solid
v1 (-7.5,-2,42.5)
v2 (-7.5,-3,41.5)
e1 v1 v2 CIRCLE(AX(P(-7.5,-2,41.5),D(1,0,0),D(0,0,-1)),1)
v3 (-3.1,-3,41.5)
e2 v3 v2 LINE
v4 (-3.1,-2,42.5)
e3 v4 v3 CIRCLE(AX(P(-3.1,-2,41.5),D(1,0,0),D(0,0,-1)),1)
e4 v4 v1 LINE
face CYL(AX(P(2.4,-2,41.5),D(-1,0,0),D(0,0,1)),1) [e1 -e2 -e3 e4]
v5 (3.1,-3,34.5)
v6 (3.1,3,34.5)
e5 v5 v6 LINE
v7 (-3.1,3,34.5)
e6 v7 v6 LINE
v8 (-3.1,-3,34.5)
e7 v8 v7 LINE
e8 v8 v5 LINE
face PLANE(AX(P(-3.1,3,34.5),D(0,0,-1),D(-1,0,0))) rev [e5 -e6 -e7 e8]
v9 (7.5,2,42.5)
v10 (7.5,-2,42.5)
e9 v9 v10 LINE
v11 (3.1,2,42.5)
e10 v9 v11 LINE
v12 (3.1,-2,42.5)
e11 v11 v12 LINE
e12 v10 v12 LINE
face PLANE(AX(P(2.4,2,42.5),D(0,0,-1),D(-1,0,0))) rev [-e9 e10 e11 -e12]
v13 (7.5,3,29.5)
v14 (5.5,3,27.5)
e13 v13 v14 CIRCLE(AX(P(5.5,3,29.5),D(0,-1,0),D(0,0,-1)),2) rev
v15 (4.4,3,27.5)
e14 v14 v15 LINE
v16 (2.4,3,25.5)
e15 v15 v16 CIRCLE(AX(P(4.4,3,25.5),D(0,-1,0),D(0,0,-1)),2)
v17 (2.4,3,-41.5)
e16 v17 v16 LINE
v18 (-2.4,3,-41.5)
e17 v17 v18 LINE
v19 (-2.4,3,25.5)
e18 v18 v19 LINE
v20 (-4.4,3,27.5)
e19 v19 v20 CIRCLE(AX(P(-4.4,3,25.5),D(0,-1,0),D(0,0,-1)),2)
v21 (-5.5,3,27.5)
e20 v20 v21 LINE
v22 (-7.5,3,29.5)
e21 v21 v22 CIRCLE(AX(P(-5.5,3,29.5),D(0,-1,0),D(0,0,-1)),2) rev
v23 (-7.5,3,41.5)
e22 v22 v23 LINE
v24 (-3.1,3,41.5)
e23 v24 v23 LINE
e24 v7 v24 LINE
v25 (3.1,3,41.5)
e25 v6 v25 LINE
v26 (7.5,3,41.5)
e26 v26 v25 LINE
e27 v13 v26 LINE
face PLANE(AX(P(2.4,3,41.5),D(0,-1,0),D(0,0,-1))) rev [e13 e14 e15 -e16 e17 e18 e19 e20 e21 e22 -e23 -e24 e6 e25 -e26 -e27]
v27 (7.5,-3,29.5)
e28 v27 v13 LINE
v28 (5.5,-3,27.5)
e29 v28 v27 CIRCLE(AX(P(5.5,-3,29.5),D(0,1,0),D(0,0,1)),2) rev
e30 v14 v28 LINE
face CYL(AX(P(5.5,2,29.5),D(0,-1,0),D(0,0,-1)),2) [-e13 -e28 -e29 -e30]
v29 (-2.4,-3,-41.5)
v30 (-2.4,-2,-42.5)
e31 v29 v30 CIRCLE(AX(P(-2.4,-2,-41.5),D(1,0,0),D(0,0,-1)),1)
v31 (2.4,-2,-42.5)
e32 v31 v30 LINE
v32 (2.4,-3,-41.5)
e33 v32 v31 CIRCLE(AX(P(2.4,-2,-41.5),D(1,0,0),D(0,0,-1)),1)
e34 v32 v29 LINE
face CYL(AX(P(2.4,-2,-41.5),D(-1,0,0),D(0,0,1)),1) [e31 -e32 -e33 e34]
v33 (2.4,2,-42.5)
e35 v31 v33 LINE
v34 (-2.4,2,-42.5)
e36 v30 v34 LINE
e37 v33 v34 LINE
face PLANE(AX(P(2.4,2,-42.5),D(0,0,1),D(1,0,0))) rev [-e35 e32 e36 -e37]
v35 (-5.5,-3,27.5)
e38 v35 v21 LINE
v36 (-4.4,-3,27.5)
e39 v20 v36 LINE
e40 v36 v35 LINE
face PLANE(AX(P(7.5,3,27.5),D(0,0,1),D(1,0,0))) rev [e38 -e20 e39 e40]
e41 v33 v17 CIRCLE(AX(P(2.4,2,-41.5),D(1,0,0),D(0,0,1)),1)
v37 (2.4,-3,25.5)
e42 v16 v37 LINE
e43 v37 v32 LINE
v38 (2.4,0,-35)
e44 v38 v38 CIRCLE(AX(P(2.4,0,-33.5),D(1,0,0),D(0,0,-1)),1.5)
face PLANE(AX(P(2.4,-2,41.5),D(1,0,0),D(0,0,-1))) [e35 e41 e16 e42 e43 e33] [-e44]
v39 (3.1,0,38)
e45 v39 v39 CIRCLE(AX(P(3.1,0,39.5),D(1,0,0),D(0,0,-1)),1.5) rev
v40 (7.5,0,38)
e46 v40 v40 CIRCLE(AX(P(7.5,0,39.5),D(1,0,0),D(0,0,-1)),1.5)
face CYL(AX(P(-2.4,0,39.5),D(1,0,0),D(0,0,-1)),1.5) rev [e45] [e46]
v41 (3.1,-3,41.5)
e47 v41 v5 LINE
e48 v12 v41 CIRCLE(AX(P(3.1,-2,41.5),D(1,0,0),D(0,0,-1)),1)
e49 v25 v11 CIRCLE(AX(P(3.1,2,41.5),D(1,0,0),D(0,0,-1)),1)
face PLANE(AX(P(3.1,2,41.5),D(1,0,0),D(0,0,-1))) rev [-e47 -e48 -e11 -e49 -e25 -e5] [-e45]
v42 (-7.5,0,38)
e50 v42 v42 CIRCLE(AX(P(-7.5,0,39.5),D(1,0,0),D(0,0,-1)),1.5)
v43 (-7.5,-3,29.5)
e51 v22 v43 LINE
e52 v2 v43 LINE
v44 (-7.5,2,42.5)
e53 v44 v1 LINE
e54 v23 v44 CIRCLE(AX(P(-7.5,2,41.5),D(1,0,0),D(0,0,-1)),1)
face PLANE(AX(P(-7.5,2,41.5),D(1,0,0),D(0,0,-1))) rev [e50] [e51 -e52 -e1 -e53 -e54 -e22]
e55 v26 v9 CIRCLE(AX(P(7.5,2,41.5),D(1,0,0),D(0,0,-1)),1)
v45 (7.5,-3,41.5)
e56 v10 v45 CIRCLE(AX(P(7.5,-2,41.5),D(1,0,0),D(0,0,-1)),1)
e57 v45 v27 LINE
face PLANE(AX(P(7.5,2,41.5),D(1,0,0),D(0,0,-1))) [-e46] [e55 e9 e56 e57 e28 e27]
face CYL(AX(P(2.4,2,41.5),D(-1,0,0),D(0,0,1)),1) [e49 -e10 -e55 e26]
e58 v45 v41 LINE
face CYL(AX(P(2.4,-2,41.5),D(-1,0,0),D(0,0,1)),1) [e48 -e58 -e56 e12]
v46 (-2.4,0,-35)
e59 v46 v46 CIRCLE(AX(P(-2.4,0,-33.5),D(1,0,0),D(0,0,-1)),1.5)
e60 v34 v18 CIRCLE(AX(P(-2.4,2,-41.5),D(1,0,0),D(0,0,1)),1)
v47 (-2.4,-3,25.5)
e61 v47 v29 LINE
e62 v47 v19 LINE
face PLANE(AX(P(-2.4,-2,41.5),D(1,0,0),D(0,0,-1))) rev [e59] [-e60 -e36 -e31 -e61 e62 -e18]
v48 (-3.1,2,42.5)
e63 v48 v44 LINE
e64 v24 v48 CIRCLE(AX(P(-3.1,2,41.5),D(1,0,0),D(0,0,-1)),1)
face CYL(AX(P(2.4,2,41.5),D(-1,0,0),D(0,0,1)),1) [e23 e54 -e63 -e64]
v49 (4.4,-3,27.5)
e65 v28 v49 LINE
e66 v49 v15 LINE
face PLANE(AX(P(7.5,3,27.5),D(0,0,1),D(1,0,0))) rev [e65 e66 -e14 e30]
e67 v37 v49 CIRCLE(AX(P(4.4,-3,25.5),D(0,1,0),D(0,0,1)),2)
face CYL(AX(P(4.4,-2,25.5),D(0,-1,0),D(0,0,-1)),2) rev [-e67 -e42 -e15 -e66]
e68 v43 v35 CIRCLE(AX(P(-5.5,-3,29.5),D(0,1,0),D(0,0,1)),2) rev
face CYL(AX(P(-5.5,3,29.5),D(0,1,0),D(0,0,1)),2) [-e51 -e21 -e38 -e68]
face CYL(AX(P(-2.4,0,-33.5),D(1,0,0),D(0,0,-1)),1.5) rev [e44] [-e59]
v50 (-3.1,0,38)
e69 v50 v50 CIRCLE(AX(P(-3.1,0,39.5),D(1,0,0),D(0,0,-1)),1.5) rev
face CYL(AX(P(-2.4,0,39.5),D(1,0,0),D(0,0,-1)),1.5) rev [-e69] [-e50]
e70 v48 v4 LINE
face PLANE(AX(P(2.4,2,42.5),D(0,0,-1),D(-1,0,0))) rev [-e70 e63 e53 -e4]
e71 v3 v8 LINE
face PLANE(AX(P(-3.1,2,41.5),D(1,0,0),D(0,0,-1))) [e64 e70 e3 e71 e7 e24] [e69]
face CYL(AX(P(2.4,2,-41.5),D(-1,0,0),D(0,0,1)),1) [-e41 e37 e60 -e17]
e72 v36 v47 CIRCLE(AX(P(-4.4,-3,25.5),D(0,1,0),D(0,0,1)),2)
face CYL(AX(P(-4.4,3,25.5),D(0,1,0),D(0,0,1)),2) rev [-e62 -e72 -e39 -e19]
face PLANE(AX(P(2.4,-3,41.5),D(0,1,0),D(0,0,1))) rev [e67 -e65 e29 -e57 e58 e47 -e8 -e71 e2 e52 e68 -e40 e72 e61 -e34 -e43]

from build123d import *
from build123d.topology import SkipClean

# Parameters (mm, degrees)
SALIENTE_EXTRUIR1_DEPTH    = 2.4
CORTAR_EXTRUIR1_DEPTH      = 43.673293756
CORTAR_EXTRUIR1_DEPTH_BACK = 43.673293756
CROQUIS2_R                 = 1.5
CROQUIS3_R                 = 1.5
SALIENTE_EXTRUIR2_DEPTH    = 7.5
CORTAR_EXTRUIR2_DEPTH      = 3.1
REDONDEO1_R                = 2


with BuildPart() as part:
    # Croquis1 → Saliente-Extruir1 (new, symmetric)
    with BuildSketch(Plane(origin=(0, 0, 0), x_dir=(0, 0, -1), z_dir=(1, 0, 0))):
        with BuildLine():
            Line((-41.5, 3), (41.5, 3))
            ThreePointArc((41.5, 3), (42.207106781, 2.707106781), (42.5, 2))
            Line((42.5, 2), (42.5, -2))
            ThreePointArc((42.5, -2), (42.207106781, -2.707106781), (41.5, -3))
            Line((41.5, -3), (-41.5, -3))
            ThreePointArc((-41.5, -3), (-42.207106781, -2.707106781), (-42.5, -2))
            Line((-42.5, -2), (-42.5, 2))
            ThreePointArc((-42.5, 2), (-42.207106781, 2.707106781), (-41.5, 3))
        make_face()
    extrude(amount=SALIENTE_EXTRUIR1_DEPTH, both=True)

    # Croquis2 → Cortar-Extruir1 (cut, two sides: drawn at the far end of the back side and taken through both)
    with BuildSketch(Plane(origin=(0, 0, 0), x_dir=(0, 0, -1), z_dir=(1, 0, 0)).offset(-CORTAR_EXTRUIR1_DEPTH_BACK)):
        with Locations((-39.5, 0)):
            Circle(CROQUIS2_R)
        with Locations((33.5, 0)):
            Circle(CROQUIS2_R)
    extrude(amount=CORTAR_EXTRUIR1_DEPTH + CORTAR_EXTRUIR1_DEPTH_BACK, mode=Mode.SUBTRACT)

    # Croquis3 → Saliente-Extruir2 (add, symmetric)
    with SkipClean():  # the faces are left unmerged after this step: merging them gives an invalid solid
        with BuildSketch(Plane(origin=(0, 0, 0), x_dir=(0, 0, -1), z_dir=(1, 0, 0))):
            with BuildLine():
                Line((-42.5, 2), (-42.5, -2))
                ThreePointArc((-42.5, -2), (-42.207106781, -2.707106781), (-41.5, -3))
                Line((-41.5, -3), (-27.5, -3))
                Line((-27.5, -3), (-27.5, 3))
                Line((-27.5, 3), (-41.5, 3))
                ThreePointArc((-41.5, 3), (-42.207106781, 2.707106781), (-42.5, 2))
            make_face()
            with Locations((-39.5, 0)):
                Circle(CROQUIS3_R, mode=Mode.SUBTRACT)
        extrude(amount=SALIENTE_EXTRUIR2_DEPTH, both=True)
    add(part.part.scale(1), mode=Mode.REPLACE)  # the faces are merged on a copy

    # Croquis4 → Cortar-Extruir2 (cut, symmetric)
    with BuildSketch(Plane(origin=(0, 0, 0), x_dir=(0, 0, -1), z_dir=(1, 0, 0))):
        with BuildLine():
            Line((-41.5, 3), (-34.5, 3))
            Line((-34.5, 3), (-34.5, -3))
            Line((-34.5, -3), (-41.5, -3))
            ThreePointArc((-41.5, -3), (-42.207106781, -2.707106781), (-42.5, -2))
            Line((-42.5, -2), (-42.5, 2))
            ThreePointArc((-42.5, 2), (-42.207106781, 2.707106781), (-41.5, 3))
        make_face()
    extrude(amount=CORTAR_EXTRUIR2_DEPTH, both=True, mode=Mode.SUBTRACT)

    # Redondeo1
    redondeo1_edges = [part.edges().sort_by_distance(p)[0] for p in [
        (-2.4, 0, 27.5),
        (2.4, 0, 27.5),
        (-7.5, 0, 27.5),
        (7.5, 0, 27.5),
    ]]
    fillet(redondeo1_edges, radius=REDONDEO1_R)


solid = part.part
